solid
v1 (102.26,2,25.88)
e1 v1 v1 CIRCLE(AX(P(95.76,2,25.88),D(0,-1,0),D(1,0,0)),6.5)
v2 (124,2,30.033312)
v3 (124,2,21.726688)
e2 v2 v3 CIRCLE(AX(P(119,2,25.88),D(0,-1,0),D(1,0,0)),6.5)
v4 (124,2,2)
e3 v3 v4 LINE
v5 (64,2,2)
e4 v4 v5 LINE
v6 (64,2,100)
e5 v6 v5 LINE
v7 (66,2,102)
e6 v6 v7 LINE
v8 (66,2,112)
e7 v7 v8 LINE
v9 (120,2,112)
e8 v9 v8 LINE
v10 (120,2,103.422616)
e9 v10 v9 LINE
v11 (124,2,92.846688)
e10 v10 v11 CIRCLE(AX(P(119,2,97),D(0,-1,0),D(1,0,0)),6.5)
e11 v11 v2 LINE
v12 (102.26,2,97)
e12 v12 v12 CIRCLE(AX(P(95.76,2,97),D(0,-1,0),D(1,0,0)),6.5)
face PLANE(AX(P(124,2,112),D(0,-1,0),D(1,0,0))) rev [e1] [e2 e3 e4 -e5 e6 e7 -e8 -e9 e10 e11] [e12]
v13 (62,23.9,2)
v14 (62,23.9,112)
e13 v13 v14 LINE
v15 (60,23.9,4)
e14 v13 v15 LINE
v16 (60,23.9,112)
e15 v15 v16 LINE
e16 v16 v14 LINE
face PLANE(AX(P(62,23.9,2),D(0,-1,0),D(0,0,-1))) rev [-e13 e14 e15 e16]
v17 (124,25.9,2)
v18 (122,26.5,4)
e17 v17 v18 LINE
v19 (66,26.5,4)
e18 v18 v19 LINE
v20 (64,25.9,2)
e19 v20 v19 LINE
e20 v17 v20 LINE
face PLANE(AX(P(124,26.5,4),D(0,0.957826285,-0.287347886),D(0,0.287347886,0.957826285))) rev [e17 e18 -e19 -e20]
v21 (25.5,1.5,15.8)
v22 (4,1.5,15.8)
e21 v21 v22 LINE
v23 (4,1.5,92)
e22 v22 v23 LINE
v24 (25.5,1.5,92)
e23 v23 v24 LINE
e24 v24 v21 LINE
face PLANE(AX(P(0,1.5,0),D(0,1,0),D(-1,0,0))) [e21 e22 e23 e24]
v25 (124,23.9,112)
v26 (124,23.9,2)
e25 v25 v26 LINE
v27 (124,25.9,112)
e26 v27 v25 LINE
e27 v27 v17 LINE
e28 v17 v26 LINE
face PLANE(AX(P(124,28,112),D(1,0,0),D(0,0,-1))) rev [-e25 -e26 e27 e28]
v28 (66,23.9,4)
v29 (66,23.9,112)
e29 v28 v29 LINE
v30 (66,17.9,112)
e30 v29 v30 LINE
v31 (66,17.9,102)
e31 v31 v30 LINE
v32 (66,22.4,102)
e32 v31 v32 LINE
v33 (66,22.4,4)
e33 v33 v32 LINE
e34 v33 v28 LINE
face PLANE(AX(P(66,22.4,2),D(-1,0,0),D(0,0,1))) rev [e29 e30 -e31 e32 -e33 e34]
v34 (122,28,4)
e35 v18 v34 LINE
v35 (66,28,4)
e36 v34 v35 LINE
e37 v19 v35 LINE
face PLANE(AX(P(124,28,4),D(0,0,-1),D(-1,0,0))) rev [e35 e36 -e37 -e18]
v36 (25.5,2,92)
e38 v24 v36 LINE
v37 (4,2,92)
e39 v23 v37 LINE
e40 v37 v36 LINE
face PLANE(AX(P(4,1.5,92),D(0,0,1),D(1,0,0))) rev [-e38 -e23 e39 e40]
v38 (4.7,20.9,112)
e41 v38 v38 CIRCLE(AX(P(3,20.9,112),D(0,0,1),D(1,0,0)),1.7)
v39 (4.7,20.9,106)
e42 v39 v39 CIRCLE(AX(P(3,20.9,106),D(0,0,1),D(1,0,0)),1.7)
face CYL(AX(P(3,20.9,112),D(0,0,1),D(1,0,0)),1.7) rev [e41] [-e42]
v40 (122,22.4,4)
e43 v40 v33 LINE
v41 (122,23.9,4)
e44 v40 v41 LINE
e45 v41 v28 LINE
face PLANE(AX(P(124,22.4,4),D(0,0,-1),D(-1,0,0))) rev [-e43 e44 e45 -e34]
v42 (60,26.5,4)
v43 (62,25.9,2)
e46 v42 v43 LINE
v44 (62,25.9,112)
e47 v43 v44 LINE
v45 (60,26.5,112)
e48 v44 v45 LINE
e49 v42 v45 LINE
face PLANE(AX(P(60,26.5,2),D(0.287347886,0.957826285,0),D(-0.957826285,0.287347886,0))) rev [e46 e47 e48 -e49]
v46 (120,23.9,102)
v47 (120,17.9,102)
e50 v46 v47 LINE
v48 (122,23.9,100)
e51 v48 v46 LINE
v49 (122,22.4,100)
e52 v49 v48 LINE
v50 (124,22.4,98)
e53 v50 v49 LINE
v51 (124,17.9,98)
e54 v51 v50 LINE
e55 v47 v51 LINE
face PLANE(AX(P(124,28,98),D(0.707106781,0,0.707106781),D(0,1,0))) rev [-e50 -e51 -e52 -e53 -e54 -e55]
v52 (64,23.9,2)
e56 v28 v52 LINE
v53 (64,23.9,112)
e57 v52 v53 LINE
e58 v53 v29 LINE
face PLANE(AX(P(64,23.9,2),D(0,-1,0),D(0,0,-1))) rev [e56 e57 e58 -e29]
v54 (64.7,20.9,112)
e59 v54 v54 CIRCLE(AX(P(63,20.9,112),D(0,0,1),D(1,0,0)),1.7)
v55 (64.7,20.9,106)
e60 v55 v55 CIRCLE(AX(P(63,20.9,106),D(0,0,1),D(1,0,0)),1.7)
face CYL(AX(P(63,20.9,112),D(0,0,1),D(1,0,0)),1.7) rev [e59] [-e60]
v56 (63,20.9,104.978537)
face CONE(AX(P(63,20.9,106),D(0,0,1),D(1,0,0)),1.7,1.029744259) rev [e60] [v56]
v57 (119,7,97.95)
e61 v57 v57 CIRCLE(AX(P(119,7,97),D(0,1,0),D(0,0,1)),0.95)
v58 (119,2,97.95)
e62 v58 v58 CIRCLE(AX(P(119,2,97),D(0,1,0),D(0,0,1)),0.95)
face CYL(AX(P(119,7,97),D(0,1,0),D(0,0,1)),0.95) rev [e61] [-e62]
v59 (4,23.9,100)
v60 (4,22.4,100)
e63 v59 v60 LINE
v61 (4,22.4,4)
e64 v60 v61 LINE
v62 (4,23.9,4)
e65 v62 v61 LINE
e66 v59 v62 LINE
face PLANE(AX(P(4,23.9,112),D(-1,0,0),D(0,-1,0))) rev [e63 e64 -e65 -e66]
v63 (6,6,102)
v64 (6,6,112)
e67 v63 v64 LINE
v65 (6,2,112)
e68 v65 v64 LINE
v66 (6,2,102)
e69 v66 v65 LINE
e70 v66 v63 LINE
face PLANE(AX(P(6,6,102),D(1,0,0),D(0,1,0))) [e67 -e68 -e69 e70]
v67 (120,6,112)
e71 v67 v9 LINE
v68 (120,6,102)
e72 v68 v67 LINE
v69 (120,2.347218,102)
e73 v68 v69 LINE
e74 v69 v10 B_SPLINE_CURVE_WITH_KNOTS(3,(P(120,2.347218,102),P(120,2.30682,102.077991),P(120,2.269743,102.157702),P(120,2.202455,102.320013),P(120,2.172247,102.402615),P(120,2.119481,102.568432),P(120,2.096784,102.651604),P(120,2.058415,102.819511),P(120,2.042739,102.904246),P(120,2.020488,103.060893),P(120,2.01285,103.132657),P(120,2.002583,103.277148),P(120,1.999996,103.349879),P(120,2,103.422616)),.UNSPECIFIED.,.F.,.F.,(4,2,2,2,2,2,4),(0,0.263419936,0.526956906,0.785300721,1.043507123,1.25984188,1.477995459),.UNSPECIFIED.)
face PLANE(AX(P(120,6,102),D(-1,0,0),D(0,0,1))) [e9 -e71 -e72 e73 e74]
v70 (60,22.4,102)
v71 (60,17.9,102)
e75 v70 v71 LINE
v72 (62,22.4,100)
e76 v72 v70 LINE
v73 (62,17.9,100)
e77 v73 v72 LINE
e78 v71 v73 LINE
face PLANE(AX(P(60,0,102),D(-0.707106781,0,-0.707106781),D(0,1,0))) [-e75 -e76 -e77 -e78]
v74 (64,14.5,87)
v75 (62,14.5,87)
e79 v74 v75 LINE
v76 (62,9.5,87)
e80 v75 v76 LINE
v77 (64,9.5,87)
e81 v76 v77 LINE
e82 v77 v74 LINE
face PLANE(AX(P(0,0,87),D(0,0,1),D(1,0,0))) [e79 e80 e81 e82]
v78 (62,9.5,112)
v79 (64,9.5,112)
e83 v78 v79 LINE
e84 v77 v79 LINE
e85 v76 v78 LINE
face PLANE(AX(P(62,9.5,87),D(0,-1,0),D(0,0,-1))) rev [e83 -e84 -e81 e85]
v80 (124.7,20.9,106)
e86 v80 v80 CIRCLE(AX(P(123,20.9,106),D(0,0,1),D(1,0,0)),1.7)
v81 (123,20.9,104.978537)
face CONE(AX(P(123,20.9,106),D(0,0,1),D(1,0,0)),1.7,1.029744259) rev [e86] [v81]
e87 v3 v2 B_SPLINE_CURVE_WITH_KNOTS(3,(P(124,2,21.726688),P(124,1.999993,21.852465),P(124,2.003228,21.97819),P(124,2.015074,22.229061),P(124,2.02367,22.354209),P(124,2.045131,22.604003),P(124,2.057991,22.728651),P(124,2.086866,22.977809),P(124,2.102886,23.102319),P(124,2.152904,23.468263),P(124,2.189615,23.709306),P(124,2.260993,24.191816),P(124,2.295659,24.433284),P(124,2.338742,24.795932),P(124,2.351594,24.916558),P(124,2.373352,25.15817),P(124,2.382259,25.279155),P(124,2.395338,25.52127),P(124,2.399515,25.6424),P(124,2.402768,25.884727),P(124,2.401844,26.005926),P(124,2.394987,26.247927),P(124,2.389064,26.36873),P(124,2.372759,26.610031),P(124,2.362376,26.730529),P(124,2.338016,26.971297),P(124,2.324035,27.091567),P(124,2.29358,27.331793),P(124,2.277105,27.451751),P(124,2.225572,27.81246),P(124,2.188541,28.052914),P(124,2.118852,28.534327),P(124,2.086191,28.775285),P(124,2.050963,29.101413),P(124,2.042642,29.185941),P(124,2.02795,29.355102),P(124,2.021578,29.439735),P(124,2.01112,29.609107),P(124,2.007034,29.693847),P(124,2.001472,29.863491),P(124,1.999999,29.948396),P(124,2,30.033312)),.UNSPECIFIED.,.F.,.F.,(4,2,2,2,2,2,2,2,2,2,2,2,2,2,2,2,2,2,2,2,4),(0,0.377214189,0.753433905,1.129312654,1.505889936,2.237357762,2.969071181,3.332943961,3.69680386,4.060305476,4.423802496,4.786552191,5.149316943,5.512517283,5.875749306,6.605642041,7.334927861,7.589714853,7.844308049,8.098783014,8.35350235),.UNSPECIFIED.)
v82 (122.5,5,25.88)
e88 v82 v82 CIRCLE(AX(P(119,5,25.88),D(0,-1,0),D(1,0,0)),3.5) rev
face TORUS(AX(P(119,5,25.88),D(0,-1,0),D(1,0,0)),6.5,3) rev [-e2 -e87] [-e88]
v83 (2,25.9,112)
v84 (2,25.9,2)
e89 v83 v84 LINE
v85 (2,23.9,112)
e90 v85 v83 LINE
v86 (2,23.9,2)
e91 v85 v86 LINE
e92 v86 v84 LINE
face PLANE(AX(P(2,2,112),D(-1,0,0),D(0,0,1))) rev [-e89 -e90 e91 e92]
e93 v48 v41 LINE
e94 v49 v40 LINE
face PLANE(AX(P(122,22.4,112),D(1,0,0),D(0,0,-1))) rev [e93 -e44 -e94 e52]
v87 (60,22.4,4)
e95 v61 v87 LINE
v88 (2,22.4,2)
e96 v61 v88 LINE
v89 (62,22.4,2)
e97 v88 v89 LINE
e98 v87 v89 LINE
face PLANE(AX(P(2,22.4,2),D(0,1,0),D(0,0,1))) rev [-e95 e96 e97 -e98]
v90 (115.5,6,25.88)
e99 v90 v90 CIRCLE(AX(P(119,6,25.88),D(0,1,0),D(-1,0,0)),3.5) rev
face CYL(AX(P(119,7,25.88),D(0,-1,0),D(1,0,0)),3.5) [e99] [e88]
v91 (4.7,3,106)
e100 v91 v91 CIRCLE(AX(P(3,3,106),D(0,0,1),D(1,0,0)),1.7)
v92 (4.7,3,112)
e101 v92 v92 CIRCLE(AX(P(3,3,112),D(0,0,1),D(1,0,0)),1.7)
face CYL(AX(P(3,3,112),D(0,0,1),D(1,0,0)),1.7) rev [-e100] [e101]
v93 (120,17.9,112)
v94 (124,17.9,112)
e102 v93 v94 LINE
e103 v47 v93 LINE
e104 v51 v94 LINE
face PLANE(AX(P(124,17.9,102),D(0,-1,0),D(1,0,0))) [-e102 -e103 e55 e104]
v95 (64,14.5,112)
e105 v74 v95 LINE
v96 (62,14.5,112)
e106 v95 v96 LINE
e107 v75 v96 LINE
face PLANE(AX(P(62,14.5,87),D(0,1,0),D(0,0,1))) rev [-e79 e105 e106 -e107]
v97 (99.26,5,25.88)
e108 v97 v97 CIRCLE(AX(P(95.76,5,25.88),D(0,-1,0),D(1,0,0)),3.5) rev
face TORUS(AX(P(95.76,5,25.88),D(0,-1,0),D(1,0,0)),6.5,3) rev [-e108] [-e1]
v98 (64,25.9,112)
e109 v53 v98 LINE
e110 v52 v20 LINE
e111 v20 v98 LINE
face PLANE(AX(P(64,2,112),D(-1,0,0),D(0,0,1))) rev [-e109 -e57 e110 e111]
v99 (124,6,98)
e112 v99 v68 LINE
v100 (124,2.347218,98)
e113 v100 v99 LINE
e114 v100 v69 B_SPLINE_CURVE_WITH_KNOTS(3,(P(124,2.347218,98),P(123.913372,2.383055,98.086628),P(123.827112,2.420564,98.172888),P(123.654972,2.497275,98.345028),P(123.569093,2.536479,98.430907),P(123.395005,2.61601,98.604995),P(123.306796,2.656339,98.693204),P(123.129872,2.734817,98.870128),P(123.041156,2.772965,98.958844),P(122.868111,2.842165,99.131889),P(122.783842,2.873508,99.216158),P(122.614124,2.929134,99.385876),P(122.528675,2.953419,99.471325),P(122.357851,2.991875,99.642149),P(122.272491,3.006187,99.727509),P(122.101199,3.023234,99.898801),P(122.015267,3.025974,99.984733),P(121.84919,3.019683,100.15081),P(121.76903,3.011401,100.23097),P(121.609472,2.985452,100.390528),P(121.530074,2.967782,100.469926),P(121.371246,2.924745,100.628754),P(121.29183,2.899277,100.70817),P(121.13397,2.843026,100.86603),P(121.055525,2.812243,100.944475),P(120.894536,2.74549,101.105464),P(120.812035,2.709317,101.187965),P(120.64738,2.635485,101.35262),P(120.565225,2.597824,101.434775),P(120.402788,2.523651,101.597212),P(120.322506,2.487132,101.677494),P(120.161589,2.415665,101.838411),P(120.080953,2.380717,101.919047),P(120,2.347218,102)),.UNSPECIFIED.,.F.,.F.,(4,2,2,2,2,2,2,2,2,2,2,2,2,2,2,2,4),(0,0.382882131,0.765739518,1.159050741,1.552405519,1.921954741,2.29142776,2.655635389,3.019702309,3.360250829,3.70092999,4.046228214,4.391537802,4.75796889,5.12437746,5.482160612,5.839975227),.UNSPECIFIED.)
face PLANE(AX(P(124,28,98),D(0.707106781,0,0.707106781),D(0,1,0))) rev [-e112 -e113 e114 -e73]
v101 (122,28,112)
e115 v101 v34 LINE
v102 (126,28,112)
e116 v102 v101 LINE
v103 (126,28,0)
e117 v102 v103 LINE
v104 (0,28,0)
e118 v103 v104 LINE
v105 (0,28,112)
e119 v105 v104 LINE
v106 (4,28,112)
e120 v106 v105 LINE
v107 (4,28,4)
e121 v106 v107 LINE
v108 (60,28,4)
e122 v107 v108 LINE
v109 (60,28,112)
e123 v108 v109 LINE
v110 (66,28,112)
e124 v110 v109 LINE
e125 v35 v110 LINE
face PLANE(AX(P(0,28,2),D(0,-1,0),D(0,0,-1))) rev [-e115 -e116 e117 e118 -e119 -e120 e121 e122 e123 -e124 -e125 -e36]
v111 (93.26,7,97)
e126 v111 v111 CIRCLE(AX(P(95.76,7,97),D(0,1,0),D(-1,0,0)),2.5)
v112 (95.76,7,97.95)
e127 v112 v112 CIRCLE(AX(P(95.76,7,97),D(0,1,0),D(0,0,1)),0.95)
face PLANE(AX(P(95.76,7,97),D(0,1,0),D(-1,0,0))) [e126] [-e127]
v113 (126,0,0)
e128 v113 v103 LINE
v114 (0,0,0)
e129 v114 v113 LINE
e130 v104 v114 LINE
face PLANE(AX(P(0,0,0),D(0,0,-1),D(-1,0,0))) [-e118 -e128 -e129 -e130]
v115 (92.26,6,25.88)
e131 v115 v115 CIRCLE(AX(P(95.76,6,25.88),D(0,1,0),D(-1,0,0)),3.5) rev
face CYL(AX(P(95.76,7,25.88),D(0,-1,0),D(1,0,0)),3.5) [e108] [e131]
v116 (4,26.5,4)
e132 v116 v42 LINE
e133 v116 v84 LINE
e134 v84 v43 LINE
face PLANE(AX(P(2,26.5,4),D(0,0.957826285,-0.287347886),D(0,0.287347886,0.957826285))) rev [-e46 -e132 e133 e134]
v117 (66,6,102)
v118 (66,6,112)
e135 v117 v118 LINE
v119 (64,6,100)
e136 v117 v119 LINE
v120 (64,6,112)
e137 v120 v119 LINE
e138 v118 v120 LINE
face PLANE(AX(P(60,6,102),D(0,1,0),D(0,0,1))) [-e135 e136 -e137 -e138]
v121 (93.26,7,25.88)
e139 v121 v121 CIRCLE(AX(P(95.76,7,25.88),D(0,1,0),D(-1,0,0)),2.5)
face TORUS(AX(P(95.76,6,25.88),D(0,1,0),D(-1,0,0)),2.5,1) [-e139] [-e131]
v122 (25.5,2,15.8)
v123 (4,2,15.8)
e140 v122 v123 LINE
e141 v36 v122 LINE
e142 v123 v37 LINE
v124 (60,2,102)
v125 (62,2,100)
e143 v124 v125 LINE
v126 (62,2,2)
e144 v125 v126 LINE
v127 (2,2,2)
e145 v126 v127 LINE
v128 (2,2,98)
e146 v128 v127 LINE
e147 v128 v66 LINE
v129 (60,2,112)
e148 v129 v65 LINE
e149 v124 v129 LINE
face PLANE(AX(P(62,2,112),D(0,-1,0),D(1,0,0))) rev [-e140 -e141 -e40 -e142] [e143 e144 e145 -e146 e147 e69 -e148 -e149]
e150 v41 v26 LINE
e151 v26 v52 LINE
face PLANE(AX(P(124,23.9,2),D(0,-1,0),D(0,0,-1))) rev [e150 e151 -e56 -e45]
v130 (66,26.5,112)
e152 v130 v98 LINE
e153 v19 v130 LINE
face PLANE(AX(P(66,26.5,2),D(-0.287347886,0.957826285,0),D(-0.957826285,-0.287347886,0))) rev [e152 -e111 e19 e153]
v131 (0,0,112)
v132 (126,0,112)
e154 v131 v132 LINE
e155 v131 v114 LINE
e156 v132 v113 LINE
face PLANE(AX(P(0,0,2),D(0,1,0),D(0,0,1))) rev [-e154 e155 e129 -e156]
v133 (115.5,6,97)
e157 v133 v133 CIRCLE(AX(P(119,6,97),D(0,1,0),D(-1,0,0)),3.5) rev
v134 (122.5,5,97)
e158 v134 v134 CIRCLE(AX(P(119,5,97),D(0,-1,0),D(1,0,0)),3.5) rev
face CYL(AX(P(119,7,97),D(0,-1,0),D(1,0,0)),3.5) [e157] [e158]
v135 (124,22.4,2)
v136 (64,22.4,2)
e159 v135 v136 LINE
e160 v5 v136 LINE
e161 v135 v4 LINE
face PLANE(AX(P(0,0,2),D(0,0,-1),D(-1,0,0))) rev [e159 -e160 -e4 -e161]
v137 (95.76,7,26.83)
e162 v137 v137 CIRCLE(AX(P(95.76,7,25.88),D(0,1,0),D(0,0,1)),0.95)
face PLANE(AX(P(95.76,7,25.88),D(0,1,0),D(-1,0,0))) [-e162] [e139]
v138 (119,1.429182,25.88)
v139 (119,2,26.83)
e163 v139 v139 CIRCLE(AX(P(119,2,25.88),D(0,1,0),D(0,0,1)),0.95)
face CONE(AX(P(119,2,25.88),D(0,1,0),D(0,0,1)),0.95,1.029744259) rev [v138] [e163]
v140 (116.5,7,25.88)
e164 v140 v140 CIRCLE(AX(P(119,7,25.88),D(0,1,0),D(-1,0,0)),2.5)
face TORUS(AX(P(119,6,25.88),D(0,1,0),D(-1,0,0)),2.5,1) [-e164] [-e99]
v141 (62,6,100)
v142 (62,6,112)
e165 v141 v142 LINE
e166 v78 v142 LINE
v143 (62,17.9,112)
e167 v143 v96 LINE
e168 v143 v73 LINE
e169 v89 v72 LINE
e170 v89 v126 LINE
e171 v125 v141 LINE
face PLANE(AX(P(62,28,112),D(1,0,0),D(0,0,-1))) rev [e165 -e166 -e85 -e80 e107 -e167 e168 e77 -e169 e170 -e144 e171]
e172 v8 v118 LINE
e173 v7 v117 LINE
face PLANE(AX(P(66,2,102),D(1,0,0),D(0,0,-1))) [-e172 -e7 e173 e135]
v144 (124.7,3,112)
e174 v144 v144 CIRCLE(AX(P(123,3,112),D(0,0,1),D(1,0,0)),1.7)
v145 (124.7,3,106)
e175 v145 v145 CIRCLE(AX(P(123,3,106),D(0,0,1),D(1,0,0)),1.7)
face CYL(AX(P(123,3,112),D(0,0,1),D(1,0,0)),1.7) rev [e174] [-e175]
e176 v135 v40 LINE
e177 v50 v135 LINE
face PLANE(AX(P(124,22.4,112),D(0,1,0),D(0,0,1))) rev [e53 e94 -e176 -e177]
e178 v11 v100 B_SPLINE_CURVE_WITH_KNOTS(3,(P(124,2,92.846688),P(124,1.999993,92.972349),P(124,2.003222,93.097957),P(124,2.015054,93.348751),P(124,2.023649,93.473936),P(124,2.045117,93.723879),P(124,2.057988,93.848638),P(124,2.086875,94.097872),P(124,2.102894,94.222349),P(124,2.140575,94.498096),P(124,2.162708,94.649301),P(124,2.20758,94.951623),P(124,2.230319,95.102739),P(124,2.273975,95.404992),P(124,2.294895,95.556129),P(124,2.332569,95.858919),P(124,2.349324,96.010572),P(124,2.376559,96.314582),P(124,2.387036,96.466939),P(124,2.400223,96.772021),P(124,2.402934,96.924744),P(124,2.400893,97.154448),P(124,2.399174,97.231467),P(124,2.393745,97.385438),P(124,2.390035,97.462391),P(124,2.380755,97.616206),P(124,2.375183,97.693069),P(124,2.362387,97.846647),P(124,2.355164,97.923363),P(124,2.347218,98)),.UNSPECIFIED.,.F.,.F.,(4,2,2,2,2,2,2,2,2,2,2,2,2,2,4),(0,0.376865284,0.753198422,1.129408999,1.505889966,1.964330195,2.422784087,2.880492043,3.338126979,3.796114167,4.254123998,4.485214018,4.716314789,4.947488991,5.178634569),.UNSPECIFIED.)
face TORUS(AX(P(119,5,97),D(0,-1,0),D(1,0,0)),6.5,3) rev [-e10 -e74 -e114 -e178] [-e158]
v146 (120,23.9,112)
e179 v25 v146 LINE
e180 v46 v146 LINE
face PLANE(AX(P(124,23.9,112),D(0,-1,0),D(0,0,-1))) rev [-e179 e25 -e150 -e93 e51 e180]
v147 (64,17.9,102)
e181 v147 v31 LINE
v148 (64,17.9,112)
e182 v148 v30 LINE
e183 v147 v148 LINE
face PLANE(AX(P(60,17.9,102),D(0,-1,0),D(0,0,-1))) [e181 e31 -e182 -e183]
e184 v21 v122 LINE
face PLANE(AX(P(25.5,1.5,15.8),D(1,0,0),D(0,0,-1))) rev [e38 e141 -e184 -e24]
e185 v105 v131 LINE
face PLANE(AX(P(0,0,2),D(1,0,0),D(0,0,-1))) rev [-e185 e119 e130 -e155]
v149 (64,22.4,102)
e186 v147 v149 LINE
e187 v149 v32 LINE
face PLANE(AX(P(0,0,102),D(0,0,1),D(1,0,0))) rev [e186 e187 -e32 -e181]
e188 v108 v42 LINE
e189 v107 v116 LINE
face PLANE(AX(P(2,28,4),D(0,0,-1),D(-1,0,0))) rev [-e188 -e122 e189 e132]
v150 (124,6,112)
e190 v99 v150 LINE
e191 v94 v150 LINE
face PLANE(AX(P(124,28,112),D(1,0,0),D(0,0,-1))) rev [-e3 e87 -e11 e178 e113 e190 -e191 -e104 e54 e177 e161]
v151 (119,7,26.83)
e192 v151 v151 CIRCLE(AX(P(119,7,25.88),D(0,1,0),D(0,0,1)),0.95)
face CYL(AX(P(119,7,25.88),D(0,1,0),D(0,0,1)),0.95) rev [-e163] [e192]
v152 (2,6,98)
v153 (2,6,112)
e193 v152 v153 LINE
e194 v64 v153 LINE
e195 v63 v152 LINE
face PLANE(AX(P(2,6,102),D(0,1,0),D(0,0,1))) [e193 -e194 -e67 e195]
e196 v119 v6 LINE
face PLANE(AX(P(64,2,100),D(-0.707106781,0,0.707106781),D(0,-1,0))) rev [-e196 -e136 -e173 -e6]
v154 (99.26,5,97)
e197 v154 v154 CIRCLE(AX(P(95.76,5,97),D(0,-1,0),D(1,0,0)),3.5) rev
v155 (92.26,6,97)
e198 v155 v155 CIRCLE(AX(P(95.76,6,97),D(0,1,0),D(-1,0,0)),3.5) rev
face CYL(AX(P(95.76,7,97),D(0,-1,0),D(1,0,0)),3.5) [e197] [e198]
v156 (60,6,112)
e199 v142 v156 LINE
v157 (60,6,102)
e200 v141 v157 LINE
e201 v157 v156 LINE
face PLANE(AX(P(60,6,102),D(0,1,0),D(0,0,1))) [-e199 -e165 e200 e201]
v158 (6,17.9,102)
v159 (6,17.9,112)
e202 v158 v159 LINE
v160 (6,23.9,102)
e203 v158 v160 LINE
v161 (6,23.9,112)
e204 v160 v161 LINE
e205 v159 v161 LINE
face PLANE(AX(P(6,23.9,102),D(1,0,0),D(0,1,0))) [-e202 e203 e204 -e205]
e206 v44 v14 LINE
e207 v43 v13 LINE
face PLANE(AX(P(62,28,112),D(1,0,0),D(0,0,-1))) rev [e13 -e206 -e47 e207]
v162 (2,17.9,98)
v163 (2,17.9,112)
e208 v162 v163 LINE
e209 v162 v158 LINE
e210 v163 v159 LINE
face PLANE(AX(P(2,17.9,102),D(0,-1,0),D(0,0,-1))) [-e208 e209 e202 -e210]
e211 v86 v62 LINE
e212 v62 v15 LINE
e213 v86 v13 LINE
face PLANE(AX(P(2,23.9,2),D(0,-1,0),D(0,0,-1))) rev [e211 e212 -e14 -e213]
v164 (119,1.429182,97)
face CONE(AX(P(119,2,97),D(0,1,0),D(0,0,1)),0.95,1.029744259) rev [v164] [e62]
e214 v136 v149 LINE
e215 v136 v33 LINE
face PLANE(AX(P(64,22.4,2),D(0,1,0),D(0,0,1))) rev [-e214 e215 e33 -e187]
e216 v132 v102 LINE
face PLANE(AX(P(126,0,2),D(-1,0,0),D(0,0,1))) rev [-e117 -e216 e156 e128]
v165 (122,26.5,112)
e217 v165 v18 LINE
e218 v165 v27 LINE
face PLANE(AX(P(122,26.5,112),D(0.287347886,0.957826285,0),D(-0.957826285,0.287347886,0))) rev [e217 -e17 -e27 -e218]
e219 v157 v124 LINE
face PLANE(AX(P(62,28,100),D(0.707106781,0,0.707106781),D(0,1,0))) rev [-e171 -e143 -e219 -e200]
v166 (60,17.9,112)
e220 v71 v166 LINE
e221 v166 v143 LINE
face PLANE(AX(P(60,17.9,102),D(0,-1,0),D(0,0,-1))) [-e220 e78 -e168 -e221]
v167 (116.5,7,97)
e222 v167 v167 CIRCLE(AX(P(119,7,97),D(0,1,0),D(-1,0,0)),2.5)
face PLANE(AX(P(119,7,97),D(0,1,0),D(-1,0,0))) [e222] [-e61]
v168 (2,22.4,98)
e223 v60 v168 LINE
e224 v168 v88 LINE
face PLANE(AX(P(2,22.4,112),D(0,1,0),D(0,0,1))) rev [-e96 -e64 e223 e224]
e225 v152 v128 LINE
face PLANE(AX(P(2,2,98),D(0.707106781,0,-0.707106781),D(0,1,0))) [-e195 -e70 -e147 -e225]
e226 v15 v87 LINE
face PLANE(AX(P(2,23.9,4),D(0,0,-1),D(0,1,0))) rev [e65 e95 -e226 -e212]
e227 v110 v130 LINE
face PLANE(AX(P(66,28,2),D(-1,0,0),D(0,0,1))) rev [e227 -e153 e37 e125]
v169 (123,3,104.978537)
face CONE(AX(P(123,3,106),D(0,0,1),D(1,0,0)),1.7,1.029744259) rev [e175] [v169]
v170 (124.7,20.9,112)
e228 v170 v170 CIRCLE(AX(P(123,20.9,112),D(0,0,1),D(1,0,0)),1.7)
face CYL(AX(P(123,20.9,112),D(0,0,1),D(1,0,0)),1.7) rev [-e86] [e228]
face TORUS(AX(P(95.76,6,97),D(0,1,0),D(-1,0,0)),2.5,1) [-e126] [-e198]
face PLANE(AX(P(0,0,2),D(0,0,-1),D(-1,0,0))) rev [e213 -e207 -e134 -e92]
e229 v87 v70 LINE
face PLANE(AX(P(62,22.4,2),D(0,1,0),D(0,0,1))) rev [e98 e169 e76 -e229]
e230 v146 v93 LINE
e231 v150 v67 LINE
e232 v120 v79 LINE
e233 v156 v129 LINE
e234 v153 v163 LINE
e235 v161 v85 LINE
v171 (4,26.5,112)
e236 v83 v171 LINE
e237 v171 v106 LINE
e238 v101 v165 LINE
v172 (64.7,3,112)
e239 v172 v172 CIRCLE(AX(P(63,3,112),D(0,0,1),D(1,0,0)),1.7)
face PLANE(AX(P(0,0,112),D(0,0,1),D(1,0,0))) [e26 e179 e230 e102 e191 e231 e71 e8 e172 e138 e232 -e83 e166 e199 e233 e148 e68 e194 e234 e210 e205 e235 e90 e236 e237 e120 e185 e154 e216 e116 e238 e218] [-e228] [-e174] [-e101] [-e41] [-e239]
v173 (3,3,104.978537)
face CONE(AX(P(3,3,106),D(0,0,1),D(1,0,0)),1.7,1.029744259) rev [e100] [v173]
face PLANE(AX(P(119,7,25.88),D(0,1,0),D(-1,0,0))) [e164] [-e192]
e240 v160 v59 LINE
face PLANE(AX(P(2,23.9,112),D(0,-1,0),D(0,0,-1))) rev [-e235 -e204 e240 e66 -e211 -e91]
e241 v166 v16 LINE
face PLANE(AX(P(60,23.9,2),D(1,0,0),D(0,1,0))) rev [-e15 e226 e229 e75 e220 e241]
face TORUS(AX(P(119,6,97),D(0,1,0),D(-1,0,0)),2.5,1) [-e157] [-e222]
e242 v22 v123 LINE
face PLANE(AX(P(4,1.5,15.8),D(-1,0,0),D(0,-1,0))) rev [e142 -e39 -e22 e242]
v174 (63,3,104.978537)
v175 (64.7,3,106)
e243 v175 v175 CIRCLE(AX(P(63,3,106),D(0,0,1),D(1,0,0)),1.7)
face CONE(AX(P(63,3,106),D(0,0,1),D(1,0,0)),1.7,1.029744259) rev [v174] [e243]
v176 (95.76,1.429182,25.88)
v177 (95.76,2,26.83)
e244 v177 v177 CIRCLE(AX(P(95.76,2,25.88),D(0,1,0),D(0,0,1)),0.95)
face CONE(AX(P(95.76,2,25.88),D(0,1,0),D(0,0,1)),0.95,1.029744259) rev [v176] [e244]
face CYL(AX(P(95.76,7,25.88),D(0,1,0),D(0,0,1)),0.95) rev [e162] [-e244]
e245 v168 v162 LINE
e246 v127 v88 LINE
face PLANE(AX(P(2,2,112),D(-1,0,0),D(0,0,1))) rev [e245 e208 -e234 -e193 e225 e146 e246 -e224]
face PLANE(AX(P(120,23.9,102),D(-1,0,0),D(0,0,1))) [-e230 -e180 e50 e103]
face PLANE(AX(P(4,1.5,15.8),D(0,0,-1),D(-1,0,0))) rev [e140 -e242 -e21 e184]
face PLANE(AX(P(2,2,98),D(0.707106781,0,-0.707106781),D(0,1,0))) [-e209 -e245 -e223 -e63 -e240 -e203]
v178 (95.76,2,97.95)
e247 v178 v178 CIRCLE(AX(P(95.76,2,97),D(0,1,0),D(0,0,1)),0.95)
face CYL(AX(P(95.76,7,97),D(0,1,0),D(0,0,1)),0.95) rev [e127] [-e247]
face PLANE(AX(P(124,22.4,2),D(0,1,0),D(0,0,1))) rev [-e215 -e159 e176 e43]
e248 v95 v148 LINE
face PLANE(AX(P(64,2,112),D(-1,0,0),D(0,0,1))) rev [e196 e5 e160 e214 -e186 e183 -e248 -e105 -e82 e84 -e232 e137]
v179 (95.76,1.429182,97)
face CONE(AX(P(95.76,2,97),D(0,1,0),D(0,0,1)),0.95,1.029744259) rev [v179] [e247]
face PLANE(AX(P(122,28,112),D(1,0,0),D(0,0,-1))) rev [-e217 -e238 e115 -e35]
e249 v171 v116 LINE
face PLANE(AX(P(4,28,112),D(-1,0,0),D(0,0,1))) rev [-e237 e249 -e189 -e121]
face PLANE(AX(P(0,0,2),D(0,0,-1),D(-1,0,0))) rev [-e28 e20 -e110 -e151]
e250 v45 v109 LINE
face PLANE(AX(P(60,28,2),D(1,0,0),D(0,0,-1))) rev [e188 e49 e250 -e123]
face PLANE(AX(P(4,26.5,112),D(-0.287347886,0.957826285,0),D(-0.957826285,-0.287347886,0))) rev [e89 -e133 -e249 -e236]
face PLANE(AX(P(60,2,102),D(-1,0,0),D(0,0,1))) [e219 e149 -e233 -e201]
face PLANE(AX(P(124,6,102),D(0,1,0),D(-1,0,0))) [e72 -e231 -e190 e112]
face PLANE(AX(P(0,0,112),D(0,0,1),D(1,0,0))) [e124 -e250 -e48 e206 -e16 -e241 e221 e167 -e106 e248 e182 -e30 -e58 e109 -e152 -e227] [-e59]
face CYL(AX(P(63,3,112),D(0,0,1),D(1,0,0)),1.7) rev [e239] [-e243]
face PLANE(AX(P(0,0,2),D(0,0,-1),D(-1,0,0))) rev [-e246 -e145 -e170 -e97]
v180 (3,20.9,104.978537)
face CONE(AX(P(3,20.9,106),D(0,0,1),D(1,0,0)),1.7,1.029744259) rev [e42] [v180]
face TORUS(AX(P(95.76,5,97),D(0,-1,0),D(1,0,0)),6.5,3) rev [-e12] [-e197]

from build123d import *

# Parameters (mm, degrees)
SKIZZE1_W                            = 126
SKIZZE1_H                            = 28
AUFSATZ_LINEAR_AUSTRAGEN1_DEPTH      = 2
AUFSATZ_LINEAR_AUSTRAGEN2_DEPTH      = 110
AUSTRAGUNG1_START                    = 1
AUSTRAGUNG1_OUTLINE_W                = 56
AUSTRAGUNG1_OUTLINE_H                = 1.5
AUSTRAGUNG1_DEPTH                    = 3
AUSTRAGUNG1_2_OUTLINE_W              = 2
AUSTRAGUNG1_2_OUTLINE_H              = 1.5
AUSTRAGUNG1_2_DEPTH                  = 111
AUSTRAGUNG1_3_DEPTH                  = 62
AUSTRAGUNG2_START                    = 1
AUSTRAGUNG2_OUTLINE_W                = 56
AUSTRAGUNG2_OUTLINE_H                = 1.5
AUSTRAGUNG2_DEPTH                    = 3
AUSTRAGUNG2_2_OUTLINE_W              = 2
AUSTRAGUNG2_2_OUTLINE_H              = 1.5
AUSTRAGUNG2_2_DEPTH                  = 111
AUSTRAGUNG2_START_2                  = 63
AUSTRAGUNG2_3_DEPTH                  = 62
SKIZZE8_W                            = 6
SKIZZE8_H                            = 6
SKIZZE8_H_2                          = 4
SKIZZE8_W_2                          = 4
AUFSATZ_LINEAR_AUSTRAGEN4_DEPTH      = 10
F_3_4_3_4_DURCHMESSER_BOHRUNG1_D     = 3.4
F_3_4_3_4_DURCHMESSER_BOHRUNG1_DEPTH = 6
F_3_4_3_4_DURCHMESSER_BOHRUNG1_TIP   = 1.021463052
FASE1_SIZE                           = 4
FASE2_SIZE                           = 2
SKIZZE11_W                           = 21.5
SKIZZE11_H                           = 76.2
SCHNITT_LINEAR_AUSTRAGEN1_DEPTH      = 0.5
SKIZZE12_R                           = 3.5
AUFSATZ_LINEAR_AUSTRAGEN5_DEPTH      = 5
F_1_9_1_9_DURCHMESSER_BOHRUNG1_D     = 1.9
F_1_9_1_9_DURCHMESSER_BOHRUNG1_DEPTH = 5
F_1_9_1_9_DURCHMESSER_BOHRUNG1_TIP   = 0.570817588
VERRUNDUNG1_R                        = 3
VERRUNDUNG2_R                        = 1
SKIZZE17_W                           = 2
SKIZZE17_H                           = 5
SCHNITT_LINEAR_AUSTRAGEN2_DEPTH      = 25


with BuildPart() as part:
    # Skizze1 → Aufsatz-Linear austragen1 (new body)
    with BuildSketch(Plane.XY):
        with Locations((63, 14)):
            Rectangle(SKIZZE1_W, SKIZZE1_H)
    extrude(amount=AUFSATZ_LINEAR_AUSTRAGEN1_DEPTH)

    # Skizze2 → Aufsatz-Linear austragen2 (add)
    with BuildSketch(Plane.XY.offset(2)):
        Polygon((0, 28), (0, 0), (126, 0), (126, 28), (124, 28), (124, 2), (64, 2), (64, 28), (62, 28), (62, 2), (2, 2), (2, 28), align=None)
    extrude(amount=AUFSATZ_LINEAR_AUSTRAGEN2_DEPTH)

    # Austragung1: read off the stored shape, not the designer's step
    # Austragung1 outline → Austragung1 (add)
    with BuildSketch(Plane.XY.offset(AUSTRAGUNG1_START)):
        with Locations((32, 23.15)):
            Rectangle(AUSTRAGUNG1_OUTLINE_W, AUSTRAGUNG1_OUTLINE_H)
    extrude(amount=AUSTRAGUNG1_DEPTH)

    # Austragung1 2 outline → Austragung1 2 (add)
    with BuildSketch(Plane.XY.offset(AUSTRAGUNG1_START)):
        with Locations((61, 23.15)):
            Rectangle(AUSTRAGUNG1_2_OUTLINE_W, AUSTRAGUNG1_2_OUTLINE_H)
        with Locations((3, 23.15)):
            Rectangle(AUSTRAGUNG1_2_OUTLINE_W, AUSTRAGUNG1_2_OUTLINE_H)
        Polygon((60, 26.5), (62, 25.9), (62, 28), (60, 28), align=None)
        Polygon((2, 28), (2, 25.9), (4, 26.5), (4, 28), align=None)
    extrude(amount=AUSTRAGUNG1_2_DEPTH)

    # Austragung1 3 outline → Austragung1 3 (add)
    with BuildSketch(Plane.YZ.offset(AUSTRAGUNG1_START)):
        Polygon((28, 4), (26.5, 4), (25.9, 2), (28, 2), align=None)
    extrude(amount=AUSTRAGUNG1_3_DEPTH)

    # Austragung2: read off the stored shape, not the designer's step
    # Austragung2 outline → Austragung2 (add)
    with BuildSketch(Plane.XY.offset(AUSTRAGUNG2_START)):
        with Locations((94, 23.15)):
            Rectangle(AUSTRAGUNG2_OUTLINE_W, AUSTRAGUNG2_OUTLINE_H)
    extrude(amount=AUSTRAGUNG2_DEPTH)

    # Austragung2 2 outline → Austragung2 2 (add)
    with BuildSketch(Plane.XY.offset(AUSTRAGUNG2_START)):
        with Locations((65, 23.15)):
            Rectangle(AUSTRAGUNG2_2_OUTLINE_W, AUSTRAGUNG2_2_OUTLINE_H)
        with Locations((123, 23.15)):
            Rectangle(AUSTRAGUNG2_2_OUTLINE_W, AUSTRAGUNG2_2_OUTLINE_H)
        Polygon((64, 28), (64, 25.9), (66, 26.5), (66, 28), align=None)
        Polygon((122, 26.5), (124, 25.9), (124, 28), (122, 28), align=None)
    extrude(amount=AUSTRAGUNG2_2_DEPTH)

    # Austragung2 3 outline → Austragung2 3 (add)
    with BuildSketch(Plane.YZ.offset(AUSTRAGUNG2_START_2)):
        Polygon((28, 4), (26.5, 4), (25.9, 2), (28, 2), align=None)
    extrude(amount=AUSTRAGUNG2_3_DEPTH)

    # Skizze8 → Aufsatz-Linear austragen4 (add)
    with BuildSketch(Plane.XY.offset(112)):
        with Locations((63, 20.9)):
            Rectangle(SKIZZE8_W, SKIZZE8_H)
        with Locations((63, 4)):
            Rectangle(SKIZZE8_W, SKIZZE8_H_2)
        with Locations((4, 4)):
            Rectangle(SKIZZE8_W_2, SKIZZE8_H_2)
        with Locations((4, 20.9)):
            Rectangle(SKIZZE8_W_2, SKIZZE8_H)
        with Locations((122, 20.9)):
            Rectangle(SKIZZE8_W_2, SKIZZE8_H)
        with Locations((122, 4)):
            Rectangle(SKIZZE8_W_2, SKIZZE8_H_2)
    extrude(amount=-AUFSATZ_LINEAR_AUSTRAGEN4_DEPTH)

    # Ø3.4 (3.4) Durchmesser Bohrung1
    with Locations(Plane.XY.offset(112)):
        with Locations((3, 20.9), (3, 3), (63, 3), (63, 20.9), (123, 20.9), (123, 3)):
            Hole(F_3_4_3_4_DURCHMESSER_BOHRUNG1_D / 2, depth=F_3_4_3_4_DURCHMESSER_BOHRUNG1_DEPTH)
            with Locations((0, 0, -(F_3_4_3_4_DURCHMESSER_BOHRUNG1_DEPTH + F_3_4_3_4_DURCHMESSER_BOHRUNG1_TIP / 2))):  # 118° drill point
                Cone(0, F_3_4_3_4_DURCHMESSER_BOHRUNG1_D / 2, F_3_4_3_4_DURCHMESSER_BOHRUNG1_TIP, mode=Mode.SUBTRACT)

    # Fase1
    # the kernel refuses this chamfer: 4 mm, written as the material it adds along each edge
    with BuildSketch(Plane(origin=(2, 17.9, 102), x_dir=(0, 0, -1), z_dir=(0, 1, 0))) as fase1_piece_1_section:
        Polygon((FASE1_SIZE, 0), (0, -FASE1_SIZE), (0, 0), align=None)
    fase1_piece_1 = extrude(amount=14.786731952, mode=Mode.PRIVATE)
    fase1_piece_1 = split(fase1_piece_1, bisect_by=Plane(origin=(2, 23.9, 102), z_dir=(0, -1, 0)), keep=Keep.TOP, mode=Mode.PRIVATE)
    add(fase1_piece_1)
    with BuildSketch(Plane(origin=(2, 2, 102), x_dir=(0, 0, -1), z_dir=(0, 1, 0))) as fase1_piece_2:
        Polygon((FASE1_SIZE, 0), (0, -FASE1_SIZE), (0, 0), align=None)
    extrude(amount=4)
    with BuildSketch(Plane(origin=(124, 17.9, 102), x_dir=(0, 0, -1), z_dir=(0, 1, 0))) as fase1_piece_3_section:
        Polygon((FASE1_SIZE, 0), (0, FASE1_SIZE), (0, 0), align=None)
    fase1_piece_3 = extrude(amount=14.786731952, mode=Mode.PRIVATE)
    fase1_piece_3 = split(fase1_piece_3, bisect_by=Plane(origin=(124, 23.9, 102), z_dir=(0, -1, 0)), keep=Keep.TOP, mode=Mode.PRIVATE)
    add(fase1_piece_3)
    with BuildSketch(Plane(origin=(124, 2, 102), x_dir=(0, 0, -1), z_dir=(0, 1, 0))) as fase1_piece_4:
        Polygon((FASE1_SIZE, 0), (0, FASE1_SIZE), (0, 0), align=None)
    extrude(amount=4)
    with BuildSketch(Plane(origin=(16.286731952, 2, 102), x_dir=(0, 0, -1), z_dir=(-1, 0, 0))) as fase1_piece_5_section:
        Polygon((FASE1_SIZE, 0), (0, -FASE1_SIZE), (0, 0), align=None)
    fase1_piece_5 = extrude(amount=14.286731952, mode=Mode.PRIVATE)
    fase1_piece_5 = split(fase1_piece_5, bisect_by=Plane(origin=(11.143365976, 2, 107.143365976), z_dir=(-0.7071067811865476, 0, 0.7071067811865476)), keep=Keep.TOP, mode=Mode.PRIVATE)
    add(fase1_piece_5)

    # Fase2
    fase2_edges = [part.edges().sort_by_distance(p)[0] for p in [
        (62, 4, 102),
        (62, 20.15, 102),
        (64, 4, 102),
    ]]
    chamfer(fase2_edges, length=FASE2_SIZE - 0.0001)  # a hair under: the kernel refuses the full size

    # Skizze11 → Schnitt-Linear austragen1 (cut)
    with BuildSketch(Plane(origin=(0, 2, 0), x_dir=(1, 0, 0), z_dir=(0, 1, 0))):
        with Locations((14.75, -53.9)):
            Rectangle(SKIZZE11_W, SKIZZE11_H)
    extrude(amount=-SCHNITT_LINEAR_AUSTRAGEN1_DEPTH, mode=Mode.SUBTRACT)

    # Skizze12 → Aufsatz-Linear austragen5 (add)
    with BuildSketch(Plane(origin=(0, 2, 0), x_dir=(1, 0, 0), z_dir=(0, 1, 0))):
        with Locations((119, -97)):
            Circle(SKIZZE12_R)
        with Locations((119, -25.88)):
            Circle(SKIZZE12_R)
        with Locations((95.76, -25.88)):
            Circle(SKIZZE12_R)
        with Locations((95.76, -97)):
            Circle(SKIZZE12_R)
    extrude(amount=AUFSATZ_LINEAR_AUSTRAGEN5_DEPTH)

    # Ø1.9 (1.9) Durchmesser Bohrung1
    with Locations(Plane(origin=(0, 7, 0), x_dir=(1, 0, 0), z_dir=(0, 1, 0))):
        with Locations((119, -97), (95.76, -97), (119, -25.88), (95.76, -25.88)):
            Hole(F_1_9_1_9_DURCHMESSER_BOHRUNG1_D / 2, depth=F_1_9_1_9_DURCHMESSER_BOHRUNG1_DEPTH)
            with Locations((0, 0, -(F_1_9_1_9_DURCHMESSER_BOHRUNG1_DEPTH + F_1_9_1_9_DURCHMESSER_BOHRUNG1_TIP / 2))):  # 118° drill point
                Cone(0, F_1_9_1_9_DURCHMESSER_BOHRUNG1_D / 2, F_1_9_1_9_DURCHMESSER_BOHRUNG1_TIP, mode=Mode.SUBTRACT)

    # Verrundung1
    # the kernel refuses this fillet: 3 mm, written as the material it adds along each edge
    with BuildSketch(Plane(origin=(119, 2, 97), x_dir=(1, 0, 0), z_dir=(0, 0, 1))) as verrundung1_piece_1:
        with BuildLine():
            CenterArc((3.5 + VERRUNDUNG1_R, VERRUNDUNG1_R), VERRUNDUNG1_R, 180, 90)
            Line((3.5, VERRUNDUNG1_R), (3.5, 0))
            Line((3.5, 0), (3.5 + VERRUNDUNG1_R, 0))
        make_face()
    revolve(axis=Axis((119, 2, 97), (0, 1, 0)))
    with BuildSketch(Plane(origin=(119, 2, 25.88), x_dir=(1, 0, 0), z_dir=(0, 0, 1))) as verrundung1_piece_2:
        with BuildLine():
            CenterArc((3.5 + VERRUNDUNG1_R, VERRUNDUNG1_R), VERRUNDUNG1_R, 180, 90)
            Line((3.5, VERRUNDUNG1_R), (3.5, 0))
            Line((3.5, 0), (3.5 + VERRUNDUNG1_R, 0))
        make_face()
    revolve(axis=Axis((119, 2, 25.88), (0, 1, 0)))
    with BuildSketch(Plane(origin=(95.76, 2, 25.88), x_dir=(1, 0, 0), z_dir=(0, 0, 1))) as verrundung1_piece_3:
        with BuildLine():
            CenterArc((3.5 + VERRUNDUNG1_R, VERRUNDUNG1_R), VERRUNDUNG1_R, 180, 90)
            Line((3.5, VERRUNDUNG1_R), (3.5, 0))
            Line((3.5, 0), (3.5 + VERRUNDUNG1_R, 0))
        make_face()
    revolve(axis=Axis((95.76, 2, 25.88), (0, 1, 0)))
    with BuildSketch(Plane(origin=(95.76, 2, 97), x_dir=(1, 0, 0), z_dir=(0, 0, 1))) as verrundung1_piece_4:
        with BuildLine():
            CenterArc((3.5 + VERRUNDUNG1_R, VERRUNDUNG1_R), VERRUNDUNG1_R, 180, 90)
            Line((3.5, VERRUNDUNG1_R), (3.5, 0))
            Line((3.5, 0), (3.5 + VERRUNDUNG1_R, 0))
        make_face()
    revolve(axis=Axis((95.76, 2, 97), (0, 1, 0)))

    # Verrundung2
    verrundung2_edges = [part.edges().sort_by_distance(p)[0] for p in [
        (92.26, 7, 97),
        (92.26, 7, 25.88),
        (115.5, 7, 25.88),
        (115.5, 7, 97),
    ]]
    fillet(verrundung2_edges, radius=VERRUNDUNG2_R)

    # Skizze17 → Schnitt-Linear austragen2 (cut)
    with BuildSketch(Plane.XY.offset(112)):
        with Locations((63, 12)):
            Rectangle(SKIZZE17_W, SKIZZE17_H)
    extrude(amount=-SCHNITT_LINEAR_AUSTRAGEN2_DEPTH, mode=Mode.SUBTRACT)


solid = part.part
